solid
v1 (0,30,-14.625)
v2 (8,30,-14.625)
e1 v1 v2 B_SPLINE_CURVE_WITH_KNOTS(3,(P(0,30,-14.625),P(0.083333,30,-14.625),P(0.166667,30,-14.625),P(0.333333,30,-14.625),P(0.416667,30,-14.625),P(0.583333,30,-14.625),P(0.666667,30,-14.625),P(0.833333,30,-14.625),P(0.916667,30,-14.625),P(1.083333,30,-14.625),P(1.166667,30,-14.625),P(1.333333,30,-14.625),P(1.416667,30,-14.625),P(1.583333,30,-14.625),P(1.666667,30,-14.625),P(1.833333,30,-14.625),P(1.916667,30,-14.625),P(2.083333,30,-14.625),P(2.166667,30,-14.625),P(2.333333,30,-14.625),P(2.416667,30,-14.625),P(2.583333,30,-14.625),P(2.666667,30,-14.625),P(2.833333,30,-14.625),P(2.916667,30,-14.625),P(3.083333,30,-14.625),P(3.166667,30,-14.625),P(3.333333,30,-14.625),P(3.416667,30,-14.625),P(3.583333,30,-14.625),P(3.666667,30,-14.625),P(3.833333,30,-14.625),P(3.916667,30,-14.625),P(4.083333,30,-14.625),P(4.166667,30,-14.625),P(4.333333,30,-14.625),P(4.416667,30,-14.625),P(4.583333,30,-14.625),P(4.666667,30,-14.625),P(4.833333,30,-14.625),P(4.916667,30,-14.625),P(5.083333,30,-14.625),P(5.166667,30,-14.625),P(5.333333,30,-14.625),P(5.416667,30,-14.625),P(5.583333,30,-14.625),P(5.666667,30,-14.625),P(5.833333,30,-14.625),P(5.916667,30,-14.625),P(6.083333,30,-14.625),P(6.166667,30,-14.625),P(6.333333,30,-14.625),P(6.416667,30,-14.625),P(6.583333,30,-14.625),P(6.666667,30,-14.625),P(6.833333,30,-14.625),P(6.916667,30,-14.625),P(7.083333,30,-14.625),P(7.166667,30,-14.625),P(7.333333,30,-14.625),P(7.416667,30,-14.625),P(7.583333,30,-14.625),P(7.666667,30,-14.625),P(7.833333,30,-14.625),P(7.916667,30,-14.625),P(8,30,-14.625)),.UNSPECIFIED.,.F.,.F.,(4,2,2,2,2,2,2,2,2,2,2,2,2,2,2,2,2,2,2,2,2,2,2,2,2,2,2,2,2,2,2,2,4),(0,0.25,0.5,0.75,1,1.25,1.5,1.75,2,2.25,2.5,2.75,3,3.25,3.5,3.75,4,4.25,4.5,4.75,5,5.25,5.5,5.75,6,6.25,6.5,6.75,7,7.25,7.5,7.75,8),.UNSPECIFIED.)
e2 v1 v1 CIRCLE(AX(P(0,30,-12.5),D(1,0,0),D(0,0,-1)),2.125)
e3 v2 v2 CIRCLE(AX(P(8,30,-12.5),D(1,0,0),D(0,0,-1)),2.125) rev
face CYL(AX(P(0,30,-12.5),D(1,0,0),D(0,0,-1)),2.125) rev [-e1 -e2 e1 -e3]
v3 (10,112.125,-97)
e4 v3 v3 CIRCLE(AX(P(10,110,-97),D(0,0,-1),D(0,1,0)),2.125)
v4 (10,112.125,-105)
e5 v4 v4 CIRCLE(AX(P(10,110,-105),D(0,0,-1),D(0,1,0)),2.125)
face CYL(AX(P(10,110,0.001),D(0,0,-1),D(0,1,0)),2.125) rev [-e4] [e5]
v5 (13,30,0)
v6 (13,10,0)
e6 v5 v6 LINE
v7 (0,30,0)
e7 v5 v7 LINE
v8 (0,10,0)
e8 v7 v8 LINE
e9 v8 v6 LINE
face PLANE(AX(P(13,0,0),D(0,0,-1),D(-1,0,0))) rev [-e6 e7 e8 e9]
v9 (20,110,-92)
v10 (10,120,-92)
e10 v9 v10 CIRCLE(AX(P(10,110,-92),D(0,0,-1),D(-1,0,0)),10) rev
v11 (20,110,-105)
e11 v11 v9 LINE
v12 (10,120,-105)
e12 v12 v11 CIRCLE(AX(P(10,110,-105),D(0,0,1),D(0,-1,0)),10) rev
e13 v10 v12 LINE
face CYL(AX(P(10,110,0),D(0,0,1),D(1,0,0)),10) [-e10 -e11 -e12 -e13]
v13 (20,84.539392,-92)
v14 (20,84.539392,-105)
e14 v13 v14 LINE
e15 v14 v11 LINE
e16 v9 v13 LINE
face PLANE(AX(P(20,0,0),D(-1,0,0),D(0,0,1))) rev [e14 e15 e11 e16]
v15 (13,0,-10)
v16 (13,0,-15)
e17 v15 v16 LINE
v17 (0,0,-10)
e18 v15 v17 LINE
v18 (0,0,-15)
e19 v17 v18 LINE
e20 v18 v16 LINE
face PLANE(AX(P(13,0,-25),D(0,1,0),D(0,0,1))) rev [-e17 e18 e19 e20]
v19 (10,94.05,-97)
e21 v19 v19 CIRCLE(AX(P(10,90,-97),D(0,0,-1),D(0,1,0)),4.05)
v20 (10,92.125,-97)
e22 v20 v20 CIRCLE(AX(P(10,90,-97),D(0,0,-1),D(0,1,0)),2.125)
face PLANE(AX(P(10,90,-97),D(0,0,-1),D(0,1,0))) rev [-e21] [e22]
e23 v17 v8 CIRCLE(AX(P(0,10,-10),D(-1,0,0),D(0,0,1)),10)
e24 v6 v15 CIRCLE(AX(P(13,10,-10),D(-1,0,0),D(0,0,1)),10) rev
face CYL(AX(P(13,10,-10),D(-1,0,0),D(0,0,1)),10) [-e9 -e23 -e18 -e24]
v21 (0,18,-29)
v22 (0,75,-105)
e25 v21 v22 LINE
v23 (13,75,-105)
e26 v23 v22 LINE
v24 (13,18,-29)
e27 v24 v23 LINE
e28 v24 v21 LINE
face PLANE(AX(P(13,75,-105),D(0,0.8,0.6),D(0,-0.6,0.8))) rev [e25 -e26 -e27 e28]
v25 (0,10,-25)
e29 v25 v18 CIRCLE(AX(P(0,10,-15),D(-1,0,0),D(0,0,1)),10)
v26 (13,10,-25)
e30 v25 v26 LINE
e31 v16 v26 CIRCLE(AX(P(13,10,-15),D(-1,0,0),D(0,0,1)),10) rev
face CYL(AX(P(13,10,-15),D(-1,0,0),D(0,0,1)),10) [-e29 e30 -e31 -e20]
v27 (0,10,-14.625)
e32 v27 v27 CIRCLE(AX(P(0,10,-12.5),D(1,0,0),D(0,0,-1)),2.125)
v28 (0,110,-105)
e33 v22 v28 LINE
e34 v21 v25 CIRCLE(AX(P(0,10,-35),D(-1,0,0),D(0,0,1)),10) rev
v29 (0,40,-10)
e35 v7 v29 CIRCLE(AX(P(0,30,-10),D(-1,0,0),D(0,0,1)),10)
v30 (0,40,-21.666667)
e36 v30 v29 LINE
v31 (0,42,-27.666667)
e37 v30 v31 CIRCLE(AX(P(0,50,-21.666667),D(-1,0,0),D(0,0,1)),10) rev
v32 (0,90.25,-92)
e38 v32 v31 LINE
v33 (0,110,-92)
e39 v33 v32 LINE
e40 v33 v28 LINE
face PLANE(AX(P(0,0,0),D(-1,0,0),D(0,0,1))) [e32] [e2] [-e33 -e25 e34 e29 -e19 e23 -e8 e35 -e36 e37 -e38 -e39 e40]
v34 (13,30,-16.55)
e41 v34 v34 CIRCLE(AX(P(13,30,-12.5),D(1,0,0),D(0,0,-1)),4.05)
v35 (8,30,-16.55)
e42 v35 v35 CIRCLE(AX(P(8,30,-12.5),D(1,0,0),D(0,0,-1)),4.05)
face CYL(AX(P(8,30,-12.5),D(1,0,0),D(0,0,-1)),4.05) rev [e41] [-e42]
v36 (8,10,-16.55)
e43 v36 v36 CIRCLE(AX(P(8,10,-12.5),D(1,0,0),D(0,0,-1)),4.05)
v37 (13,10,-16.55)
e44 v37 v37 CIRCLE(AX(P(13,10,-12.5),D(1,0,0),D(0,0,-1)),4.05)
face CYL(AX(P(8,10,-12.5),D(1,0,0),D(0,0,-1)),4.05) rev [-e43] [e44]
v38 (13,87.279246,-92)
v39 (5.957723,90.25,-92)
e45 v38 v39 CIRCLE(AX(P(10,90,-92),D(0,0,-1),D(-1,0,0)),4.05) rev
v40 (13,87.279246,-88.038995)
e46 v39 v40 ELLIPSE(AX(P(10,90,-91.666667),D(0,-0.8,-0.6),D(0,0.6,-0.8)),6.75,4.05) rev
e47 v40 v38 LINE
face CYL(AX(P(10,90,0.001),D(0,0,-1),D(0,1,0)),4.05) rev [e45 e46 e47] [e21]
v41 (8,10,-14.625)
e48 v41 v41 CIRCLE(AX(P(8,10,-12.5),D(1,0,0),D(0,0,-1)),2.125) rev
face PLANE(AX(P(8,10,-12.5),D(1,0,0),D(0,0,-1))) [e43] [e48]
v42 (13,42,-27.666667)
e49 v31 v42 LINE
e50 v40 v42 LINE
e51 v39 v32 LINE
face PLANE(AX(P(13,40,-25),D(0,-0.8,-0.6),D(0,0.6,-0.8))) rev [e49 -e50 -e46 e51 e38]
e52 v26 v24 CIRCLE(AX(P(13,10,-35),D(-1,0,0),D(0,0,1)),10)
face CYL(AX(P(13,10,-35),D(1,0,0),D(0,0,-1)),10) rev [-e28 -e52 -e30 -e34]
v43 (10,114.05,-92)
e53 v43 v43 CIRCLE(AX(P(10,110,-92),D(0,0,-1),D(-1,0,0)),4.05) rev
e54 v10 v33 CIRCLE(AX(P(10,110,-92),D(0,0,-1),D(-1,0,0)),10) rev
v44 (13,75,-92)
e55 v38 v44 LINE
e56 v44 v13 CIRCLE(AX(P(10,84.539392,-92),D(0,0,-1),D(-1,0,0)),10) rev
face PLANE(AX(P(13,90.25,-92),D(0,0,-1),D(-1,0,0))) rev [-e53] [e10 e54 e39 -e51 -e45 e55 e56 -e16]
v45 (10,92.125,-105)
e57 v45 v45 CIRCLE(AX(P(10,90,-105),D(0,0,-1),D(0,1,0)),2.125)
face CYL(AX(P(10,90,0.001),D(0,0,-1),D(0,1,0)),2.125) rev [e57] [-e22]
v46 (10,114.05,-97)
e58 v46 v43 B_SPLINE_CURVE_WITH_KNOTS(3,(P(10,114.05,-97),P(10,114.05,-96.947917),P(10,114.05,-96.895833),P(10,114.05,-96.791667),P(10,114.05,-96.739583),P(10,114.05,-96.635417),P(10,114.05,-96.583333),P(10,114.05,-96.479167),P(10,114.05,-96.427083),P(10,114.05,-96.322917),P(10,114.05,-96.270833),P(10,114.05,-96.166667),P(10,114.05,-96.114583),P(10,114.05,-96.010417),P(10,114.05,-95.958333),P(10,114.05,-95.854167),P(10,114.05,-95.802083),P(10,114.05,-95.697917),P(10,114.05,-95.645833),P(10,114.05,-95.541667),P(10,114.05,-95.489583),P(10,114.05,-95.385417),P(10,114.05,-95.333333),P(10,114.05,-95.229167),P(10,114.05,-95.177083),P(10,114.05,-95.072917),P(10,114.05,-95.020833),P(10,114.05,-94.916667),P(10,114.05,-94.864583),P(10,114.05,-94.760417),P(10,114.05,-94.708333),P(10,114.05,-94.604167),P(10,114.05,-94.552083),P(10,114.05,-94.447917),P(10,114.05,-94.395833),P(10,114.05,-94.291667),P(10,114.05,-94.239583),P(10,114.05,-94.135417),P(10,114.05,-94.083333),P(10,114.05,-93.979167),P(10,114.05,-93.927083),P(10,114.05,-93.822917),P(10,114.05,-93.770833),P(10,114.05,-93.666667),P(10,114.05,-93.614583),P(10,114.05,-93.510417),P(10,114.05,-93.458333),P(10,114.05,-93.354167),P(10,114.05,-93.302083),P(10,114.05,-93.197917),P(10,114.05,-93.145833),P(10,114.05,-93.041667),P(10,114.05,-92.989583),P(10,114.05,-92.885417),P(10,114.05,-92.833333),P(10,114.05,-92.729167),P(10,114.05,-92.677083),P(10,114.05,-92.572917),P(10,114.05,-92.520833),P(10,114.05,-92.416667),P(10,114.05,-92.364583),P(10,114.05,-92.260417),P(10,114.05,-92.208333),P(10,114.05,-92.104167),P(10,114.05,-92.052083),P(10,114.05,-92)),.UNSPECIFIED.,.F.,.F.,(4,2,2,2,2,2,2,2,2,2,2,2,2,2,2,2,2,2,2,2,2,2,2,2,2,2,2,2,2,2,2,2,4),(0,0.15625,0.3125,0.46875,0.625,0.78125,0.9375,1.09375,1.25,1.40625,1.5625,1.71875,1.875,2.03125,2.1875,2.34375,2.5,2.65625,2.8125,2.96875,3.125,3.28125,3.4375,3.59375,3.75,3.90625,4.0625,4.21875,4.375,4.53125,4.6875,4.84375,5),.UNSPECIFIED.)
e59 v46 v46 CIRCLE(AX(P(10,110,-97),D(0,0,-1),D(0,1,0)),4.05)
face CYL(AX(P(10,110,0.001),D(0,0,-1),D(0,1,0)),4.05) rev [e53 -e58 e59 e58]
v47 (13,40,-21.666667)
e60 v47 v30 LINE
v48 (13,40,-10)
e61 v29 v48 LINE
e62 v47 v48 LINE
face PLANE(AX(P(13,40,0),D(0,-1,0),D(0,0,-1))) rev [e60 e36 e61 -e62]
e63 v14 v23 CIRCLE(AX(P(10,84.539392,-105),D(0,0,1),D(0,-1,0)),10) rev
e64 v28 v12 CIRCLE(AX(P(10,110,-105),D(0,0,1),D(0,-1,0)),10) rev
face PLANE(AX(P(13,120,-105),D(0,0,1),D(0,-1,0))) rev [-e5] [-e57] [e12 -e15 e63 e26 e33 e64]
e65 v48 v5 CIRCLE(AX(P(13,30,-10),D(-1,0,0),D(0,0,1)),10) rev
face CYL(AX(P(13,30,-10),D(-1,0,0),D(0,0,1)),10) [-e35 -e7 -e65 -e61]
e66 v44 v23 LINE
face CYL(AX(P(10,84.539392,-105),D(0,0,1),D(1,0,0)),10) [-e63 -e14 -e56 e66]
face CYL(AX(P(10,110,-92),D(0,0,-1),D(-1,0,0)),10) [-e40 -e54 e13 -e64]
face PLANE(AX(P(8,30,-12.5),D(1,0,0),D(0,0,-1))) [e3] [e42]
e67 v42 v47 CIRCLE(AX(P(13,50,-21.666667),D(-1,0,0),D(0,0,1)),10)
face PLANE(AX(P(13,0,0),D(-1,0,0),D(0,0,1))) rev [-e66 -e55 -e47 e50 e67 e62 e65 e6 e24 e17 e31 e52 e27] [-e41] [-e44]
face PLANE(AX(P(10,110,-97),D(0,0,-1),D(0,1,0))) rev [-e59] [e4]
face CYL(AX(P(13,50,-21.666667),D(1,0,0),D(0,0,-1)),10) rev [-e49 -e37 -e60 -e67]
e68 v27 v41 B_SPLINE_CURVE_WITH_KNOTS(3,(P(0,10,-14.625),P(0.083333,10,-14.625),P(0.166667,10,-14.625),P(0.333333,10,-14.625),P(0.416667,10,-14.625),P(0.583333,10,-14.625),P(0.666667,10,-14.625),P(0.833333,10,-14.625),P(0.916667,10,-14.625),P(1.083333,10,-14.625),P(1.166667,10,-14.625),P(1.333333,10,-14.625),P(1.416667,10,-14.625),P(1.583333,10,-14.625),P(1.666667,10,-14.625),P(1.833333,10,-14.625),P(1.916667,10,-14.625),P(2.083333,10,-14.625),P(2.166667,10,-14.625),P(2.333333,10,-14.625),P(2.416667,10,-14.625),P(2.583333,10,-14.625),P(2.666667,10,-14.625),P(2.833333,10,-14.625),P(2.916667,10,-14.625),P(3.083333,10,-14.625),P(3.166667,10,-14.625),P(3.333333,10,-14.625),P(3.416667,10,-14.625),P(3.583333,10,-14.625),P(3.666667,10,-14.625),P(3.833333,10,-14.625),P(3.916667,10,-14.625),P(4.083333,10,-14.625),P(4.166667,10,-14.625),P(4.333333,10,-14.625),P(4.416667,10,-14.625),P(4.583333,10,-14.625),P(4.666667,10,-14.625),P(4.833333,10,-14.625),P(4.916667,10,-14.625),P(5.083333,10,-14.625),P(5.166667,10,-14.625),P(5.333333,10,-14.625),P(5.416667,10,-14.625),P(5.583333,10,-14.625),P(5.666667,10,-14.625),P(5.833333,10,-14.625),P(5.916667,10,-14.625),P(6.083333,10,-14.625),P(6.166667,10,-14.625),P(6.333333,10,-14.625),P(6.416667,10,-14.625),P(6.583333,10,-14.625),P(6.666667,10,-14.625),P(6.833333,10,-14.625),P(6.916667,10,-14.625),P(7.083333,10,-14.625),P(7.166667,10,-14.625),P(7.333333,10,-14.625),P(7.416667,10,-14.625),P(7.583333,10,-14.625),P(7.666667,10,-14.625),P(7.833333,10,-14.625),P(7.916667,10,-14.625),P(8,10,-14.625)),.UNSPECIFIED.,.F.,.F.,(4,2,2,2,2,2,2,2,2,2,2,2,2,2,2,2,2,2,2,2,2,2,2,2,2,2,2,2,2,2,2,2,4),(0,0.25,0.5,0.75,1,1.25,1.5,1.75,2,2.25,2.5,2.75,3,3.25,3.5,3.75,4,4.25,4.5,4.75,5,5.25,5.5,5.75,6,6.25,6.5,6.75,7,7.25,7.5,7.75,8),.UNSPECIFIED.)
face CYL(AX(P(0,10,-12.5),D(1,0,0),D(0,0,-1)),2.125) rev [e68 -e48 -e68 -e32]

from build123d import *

# Parameters (mm, degrees)
SALIENTE_EXTRUIR1_DEPTH = 13
CROQUIS4_W              = 13
CROQUIS4_H              = 45
SALIENTE_EXTRUIR2_DEPTH = 7
CROQUIS5_R              = 2.125
CORTAR_EXTRUIR1_DEPTH   = 160.981248901
CROQUIS6_R              = 4.05
CORTAR_EXTRUIR2_DEPTH   = 5
CORTAR_EXTRUIR3_REACH   = 162.702
CROQUIS7_R              = 2.125
CORTAR_EXTRUIR4_REACH   = 170.702
CORTAR_EXTRUIR4_START   = -8
CROQUIS8_R              = 4.05
REDONDEO2_R             = 10
REDONDEO5_R             = 10


with BuildPart() as part:
    # Croquis1 → Saliente-Extruir1 (new body)
    with BuildSketch(Plane(origin=(0, 0, 0), x_dir=(0, 0, -1), z_dir=(1, 0, 0))):
        Polygon((0, 0), (0, 40), (25, 40), (92, 90.25), (92, 120), (105, 120), (105, 75), (25, 15), (25, 0), align=None)
    extrude(amount=SALIENTE_EXTRUIR1_DEPTH)

    # Croquis4 → Saliente-Extruir2 (add)
    with BuildSketch(Plane(origin=(13, 0, 0), x_dir=(0, 0, -1), z_dir=(1, 0, 0))):
        with Locations((98.5, 97.5)):
            Rectangle(CROQUIS4_W, CROQUIS4_H)
    extrude(amount=SALIENTE_EXTRUIR2_DEPTH)

    # Croquis5 → Cortar-Extruir1 (cut, through all)
    with BuildSketch(Plane(origin=(13, 0, 0), x_dir=(0, 0, -1), z_dir=(1, 0, 0))):
        with Locations((12.5, 30)):
            Circle(CROQUIS5_R)
        with Locations((12.5, 10)):
            Circle(CROQUIS5_R)
    extrude(amount=-CORTAR_EXTRUIR1_DEPTH, mode=Mode.SUBTRACT)

    # Croquis6 → Cortar-Extruir2 (cut)
    with BuildSketch(Plane(origin=(13, 0, 0), x_dir=(0, 0, -1), z_dir=(1, 0, 0))):
        with Locations((12.5, 30)):
            Circle(CROQUIS6_R)
        with Locations((12.5, 10)):
            Circle(CROQUIS6_R)
    extrude(amount=-CORTAR_EXTRUIR2_DEPTH, mode=Mode.SUBTRACT)

    # Croquis7 → Cortar-Extruir3 (cut, up to next)
    with BuildSketch(Plane(origin=(0, 0, -105), x_dir=(-1, 0, 0), z_dir=(0, 0, -1)), mode=Mode.PRIVATE) as cortar_extruir3_sk1:
        with Locations(Location((-10, 110, 0), (0, 0, 90))):
            Circle(CROQUIS7_R)
    cortar_extruir3_tool1 = extrude(cortar_extruir3_sk1.sketch, amount=-CORTAR_EXTRUIR3_REACH, mode=Mode.PRIVATE) & part.part
    # Croquis7 → Cortar-Extruir3 (cut, up to next)
    with BuildSketch(Plane(origin=(0, 0, -105), x_dir=(-1, 0, 0), z_dir=(0, 0, -1)), mode=Mode.PRIVATE) as cortar_extruir3_sk2:
        with Locations(Location((-10, 90, 0), (0, 0, 90))):
            Circle(CROQUIS7_R)
    cortar_extruir3_tool2 = extrude(cortar_extruir3_sk2.sketch, amount=-CORTAR_EXTRUIR3_REACH, mode=Mode.PRIVATE) & part.part
    add(cortar_extruir3_tool1.solids().sort_by_distance((10, 110, -105))[0], mode=Mode.SUBTRACT)
    add(cortar_extruir3_tool2.solids().sort_by_distance((10, 90, -105))[0], mode=Mode.SUBTRACT)

    # Croquis8 → Cortar-Extruir4 (cut, up to next)
    with BuildSketch(Plane(origin=(0, 0, -105), x_dir=(-1, 0, 0), z_dir=(0, 0, -1)).offset(CORTAR_EXTRUIR4_START), mode=Mode.PRIVATE) as cortar_extruir4_sk1:
        with Locations(Location((-10, 110, 0), (0, 0, 90))):
            Circle(CROQUIS8_R)
    cortar_extruir4_tool1 = extrude(cortar_extruir4_sk1.sketch, amount=-CORTAR_EXTRUIR4_REACH, mode=Mode.PRIVATE) & part.part
    # Croquis8 → Cortar-Extruir4 (cut, up to next)
    with BuildSketch(Plane(origin=(0, 0, -105), x_dir=(-1, 0, 0), z_dir=(0, 0, -1)).offset(CORTAR_EXTRUIR4_START), mode=Mode.PRIVATE) as cortar_extruir4_sk2:
        with Locations(Location((-10, 90, 0), (0, 0, 90))):
            Circle(CROQUIS8_R)
    cortar_extruir4_tool2 = extrude(cortar_extruir4_sk2.sketch, amount=-CORTAR_EXTRUIR4_REACH, mode=Mode.PRIVATE) & part.part
    add(cortar_extruir4_tool1.solids().sort_by_distance((10, 110, -97))[0], mode=Mode.SUBTRACT)
    add(cortar_extruir4_tool2.solids().sort_by_distance((10, 90, -97))[0], mode=Mode.SUBTRACT)

    # Redondeo2
    redondeo2_edges = [part.edges().sort_by_distance(p)[0] for p in [
        (6.5, 15, -25),
    ]]
    fillet(redondeo2_edges, radius=REDONDEO2_R)

    # Redondeo5
    # the kernel refuses this fillet: 10 mm, written as the material it adds along each edge
    with BuildSketch(Plane(origin=(0, 40, -25), x_dir=(0, 0, 1), z_dir=(1, 0, 0))) as redondeo5_piece_1:
        with BuildLine():
            CenterArc((REDONDEO5_R * 0.333333333333, -REDONDEO5_R), REDONDEO5_R, 90, 36.869897646)
            Line((-REDONDEO5_R * 0.266666666667, -REDONDEO5_R * 0.2), (0, 0))
            Line((0, 0), (REDONDEO5_R * 0.333333333333, 0))
        make_face()
    extrude(amount=13)
    # the kernel refuses this fillet: 10 mm, written as the material it takes off along each edge
    with BuildSketch(Plane(origin=(-25, 0, 0), x_dir=(0, 0, -1), z_dir=(1, 0, 0)), Plane(origin=(-25, 0, -25), x_dir=(0, 1, 0), z_dir=(1, 0, 0)), Plane(origin=(-25, 40, 0), x_dir=(0, -1, 0), z_dir=(1, 0, 0)), Plane(origin=(20, 120, -130), x_dir=(-1, 0, 0), z_dir=(0, 0, 1))) as redondeo5_2_piece_1:
        with BuildLine():
            CenterArc((REDONDEO5_R, REDONDEO5_R), REDONDEO5_R, 180, 90)
            Line((0, REDONDEO5_R), (0, 0))
            Line((0, 0), (REDONDEO5_R, 0))
        make_face()
    extrude(amount=63, mode=Mode.SUBTRACT)
    with BuildSketch(Plane(origin=(20, 75, -68.151519965), x_dir=(0, 1, 0), z_dir=(0, 0, -1))) as redondeo5_2_piece_2:
        with BuildLine():
            CenterArc((9.539392014, -10), REDONDEO5_R, 90, 72.542396876)
            Line((0, -7), (0, 0))
            Line((0, 0), (9.539392014, 0))
        make_face()
    extrude(amount=60.696960071, mode=Mode.SUBTRACT)
    with BuildSketch(Plane(origin=(0, 120, -67), x_dir=(0, -1, 0), z_dir=(0, 0, -1))) as redondeo5_2_piece_3:
        with BuildLine():
            CenterArc((REDONDEO5_R, -REDONDEO5_R), REDONDEO5_R, 90, 90)
            Line((0, -REDONDEO5_R), (0, 0))
            Line((0, 0), (REDONDEO5_R, 0))
        make_face()
    extrude(amount=63, mode=Mode.SUBTRACT)


solid = part.part
